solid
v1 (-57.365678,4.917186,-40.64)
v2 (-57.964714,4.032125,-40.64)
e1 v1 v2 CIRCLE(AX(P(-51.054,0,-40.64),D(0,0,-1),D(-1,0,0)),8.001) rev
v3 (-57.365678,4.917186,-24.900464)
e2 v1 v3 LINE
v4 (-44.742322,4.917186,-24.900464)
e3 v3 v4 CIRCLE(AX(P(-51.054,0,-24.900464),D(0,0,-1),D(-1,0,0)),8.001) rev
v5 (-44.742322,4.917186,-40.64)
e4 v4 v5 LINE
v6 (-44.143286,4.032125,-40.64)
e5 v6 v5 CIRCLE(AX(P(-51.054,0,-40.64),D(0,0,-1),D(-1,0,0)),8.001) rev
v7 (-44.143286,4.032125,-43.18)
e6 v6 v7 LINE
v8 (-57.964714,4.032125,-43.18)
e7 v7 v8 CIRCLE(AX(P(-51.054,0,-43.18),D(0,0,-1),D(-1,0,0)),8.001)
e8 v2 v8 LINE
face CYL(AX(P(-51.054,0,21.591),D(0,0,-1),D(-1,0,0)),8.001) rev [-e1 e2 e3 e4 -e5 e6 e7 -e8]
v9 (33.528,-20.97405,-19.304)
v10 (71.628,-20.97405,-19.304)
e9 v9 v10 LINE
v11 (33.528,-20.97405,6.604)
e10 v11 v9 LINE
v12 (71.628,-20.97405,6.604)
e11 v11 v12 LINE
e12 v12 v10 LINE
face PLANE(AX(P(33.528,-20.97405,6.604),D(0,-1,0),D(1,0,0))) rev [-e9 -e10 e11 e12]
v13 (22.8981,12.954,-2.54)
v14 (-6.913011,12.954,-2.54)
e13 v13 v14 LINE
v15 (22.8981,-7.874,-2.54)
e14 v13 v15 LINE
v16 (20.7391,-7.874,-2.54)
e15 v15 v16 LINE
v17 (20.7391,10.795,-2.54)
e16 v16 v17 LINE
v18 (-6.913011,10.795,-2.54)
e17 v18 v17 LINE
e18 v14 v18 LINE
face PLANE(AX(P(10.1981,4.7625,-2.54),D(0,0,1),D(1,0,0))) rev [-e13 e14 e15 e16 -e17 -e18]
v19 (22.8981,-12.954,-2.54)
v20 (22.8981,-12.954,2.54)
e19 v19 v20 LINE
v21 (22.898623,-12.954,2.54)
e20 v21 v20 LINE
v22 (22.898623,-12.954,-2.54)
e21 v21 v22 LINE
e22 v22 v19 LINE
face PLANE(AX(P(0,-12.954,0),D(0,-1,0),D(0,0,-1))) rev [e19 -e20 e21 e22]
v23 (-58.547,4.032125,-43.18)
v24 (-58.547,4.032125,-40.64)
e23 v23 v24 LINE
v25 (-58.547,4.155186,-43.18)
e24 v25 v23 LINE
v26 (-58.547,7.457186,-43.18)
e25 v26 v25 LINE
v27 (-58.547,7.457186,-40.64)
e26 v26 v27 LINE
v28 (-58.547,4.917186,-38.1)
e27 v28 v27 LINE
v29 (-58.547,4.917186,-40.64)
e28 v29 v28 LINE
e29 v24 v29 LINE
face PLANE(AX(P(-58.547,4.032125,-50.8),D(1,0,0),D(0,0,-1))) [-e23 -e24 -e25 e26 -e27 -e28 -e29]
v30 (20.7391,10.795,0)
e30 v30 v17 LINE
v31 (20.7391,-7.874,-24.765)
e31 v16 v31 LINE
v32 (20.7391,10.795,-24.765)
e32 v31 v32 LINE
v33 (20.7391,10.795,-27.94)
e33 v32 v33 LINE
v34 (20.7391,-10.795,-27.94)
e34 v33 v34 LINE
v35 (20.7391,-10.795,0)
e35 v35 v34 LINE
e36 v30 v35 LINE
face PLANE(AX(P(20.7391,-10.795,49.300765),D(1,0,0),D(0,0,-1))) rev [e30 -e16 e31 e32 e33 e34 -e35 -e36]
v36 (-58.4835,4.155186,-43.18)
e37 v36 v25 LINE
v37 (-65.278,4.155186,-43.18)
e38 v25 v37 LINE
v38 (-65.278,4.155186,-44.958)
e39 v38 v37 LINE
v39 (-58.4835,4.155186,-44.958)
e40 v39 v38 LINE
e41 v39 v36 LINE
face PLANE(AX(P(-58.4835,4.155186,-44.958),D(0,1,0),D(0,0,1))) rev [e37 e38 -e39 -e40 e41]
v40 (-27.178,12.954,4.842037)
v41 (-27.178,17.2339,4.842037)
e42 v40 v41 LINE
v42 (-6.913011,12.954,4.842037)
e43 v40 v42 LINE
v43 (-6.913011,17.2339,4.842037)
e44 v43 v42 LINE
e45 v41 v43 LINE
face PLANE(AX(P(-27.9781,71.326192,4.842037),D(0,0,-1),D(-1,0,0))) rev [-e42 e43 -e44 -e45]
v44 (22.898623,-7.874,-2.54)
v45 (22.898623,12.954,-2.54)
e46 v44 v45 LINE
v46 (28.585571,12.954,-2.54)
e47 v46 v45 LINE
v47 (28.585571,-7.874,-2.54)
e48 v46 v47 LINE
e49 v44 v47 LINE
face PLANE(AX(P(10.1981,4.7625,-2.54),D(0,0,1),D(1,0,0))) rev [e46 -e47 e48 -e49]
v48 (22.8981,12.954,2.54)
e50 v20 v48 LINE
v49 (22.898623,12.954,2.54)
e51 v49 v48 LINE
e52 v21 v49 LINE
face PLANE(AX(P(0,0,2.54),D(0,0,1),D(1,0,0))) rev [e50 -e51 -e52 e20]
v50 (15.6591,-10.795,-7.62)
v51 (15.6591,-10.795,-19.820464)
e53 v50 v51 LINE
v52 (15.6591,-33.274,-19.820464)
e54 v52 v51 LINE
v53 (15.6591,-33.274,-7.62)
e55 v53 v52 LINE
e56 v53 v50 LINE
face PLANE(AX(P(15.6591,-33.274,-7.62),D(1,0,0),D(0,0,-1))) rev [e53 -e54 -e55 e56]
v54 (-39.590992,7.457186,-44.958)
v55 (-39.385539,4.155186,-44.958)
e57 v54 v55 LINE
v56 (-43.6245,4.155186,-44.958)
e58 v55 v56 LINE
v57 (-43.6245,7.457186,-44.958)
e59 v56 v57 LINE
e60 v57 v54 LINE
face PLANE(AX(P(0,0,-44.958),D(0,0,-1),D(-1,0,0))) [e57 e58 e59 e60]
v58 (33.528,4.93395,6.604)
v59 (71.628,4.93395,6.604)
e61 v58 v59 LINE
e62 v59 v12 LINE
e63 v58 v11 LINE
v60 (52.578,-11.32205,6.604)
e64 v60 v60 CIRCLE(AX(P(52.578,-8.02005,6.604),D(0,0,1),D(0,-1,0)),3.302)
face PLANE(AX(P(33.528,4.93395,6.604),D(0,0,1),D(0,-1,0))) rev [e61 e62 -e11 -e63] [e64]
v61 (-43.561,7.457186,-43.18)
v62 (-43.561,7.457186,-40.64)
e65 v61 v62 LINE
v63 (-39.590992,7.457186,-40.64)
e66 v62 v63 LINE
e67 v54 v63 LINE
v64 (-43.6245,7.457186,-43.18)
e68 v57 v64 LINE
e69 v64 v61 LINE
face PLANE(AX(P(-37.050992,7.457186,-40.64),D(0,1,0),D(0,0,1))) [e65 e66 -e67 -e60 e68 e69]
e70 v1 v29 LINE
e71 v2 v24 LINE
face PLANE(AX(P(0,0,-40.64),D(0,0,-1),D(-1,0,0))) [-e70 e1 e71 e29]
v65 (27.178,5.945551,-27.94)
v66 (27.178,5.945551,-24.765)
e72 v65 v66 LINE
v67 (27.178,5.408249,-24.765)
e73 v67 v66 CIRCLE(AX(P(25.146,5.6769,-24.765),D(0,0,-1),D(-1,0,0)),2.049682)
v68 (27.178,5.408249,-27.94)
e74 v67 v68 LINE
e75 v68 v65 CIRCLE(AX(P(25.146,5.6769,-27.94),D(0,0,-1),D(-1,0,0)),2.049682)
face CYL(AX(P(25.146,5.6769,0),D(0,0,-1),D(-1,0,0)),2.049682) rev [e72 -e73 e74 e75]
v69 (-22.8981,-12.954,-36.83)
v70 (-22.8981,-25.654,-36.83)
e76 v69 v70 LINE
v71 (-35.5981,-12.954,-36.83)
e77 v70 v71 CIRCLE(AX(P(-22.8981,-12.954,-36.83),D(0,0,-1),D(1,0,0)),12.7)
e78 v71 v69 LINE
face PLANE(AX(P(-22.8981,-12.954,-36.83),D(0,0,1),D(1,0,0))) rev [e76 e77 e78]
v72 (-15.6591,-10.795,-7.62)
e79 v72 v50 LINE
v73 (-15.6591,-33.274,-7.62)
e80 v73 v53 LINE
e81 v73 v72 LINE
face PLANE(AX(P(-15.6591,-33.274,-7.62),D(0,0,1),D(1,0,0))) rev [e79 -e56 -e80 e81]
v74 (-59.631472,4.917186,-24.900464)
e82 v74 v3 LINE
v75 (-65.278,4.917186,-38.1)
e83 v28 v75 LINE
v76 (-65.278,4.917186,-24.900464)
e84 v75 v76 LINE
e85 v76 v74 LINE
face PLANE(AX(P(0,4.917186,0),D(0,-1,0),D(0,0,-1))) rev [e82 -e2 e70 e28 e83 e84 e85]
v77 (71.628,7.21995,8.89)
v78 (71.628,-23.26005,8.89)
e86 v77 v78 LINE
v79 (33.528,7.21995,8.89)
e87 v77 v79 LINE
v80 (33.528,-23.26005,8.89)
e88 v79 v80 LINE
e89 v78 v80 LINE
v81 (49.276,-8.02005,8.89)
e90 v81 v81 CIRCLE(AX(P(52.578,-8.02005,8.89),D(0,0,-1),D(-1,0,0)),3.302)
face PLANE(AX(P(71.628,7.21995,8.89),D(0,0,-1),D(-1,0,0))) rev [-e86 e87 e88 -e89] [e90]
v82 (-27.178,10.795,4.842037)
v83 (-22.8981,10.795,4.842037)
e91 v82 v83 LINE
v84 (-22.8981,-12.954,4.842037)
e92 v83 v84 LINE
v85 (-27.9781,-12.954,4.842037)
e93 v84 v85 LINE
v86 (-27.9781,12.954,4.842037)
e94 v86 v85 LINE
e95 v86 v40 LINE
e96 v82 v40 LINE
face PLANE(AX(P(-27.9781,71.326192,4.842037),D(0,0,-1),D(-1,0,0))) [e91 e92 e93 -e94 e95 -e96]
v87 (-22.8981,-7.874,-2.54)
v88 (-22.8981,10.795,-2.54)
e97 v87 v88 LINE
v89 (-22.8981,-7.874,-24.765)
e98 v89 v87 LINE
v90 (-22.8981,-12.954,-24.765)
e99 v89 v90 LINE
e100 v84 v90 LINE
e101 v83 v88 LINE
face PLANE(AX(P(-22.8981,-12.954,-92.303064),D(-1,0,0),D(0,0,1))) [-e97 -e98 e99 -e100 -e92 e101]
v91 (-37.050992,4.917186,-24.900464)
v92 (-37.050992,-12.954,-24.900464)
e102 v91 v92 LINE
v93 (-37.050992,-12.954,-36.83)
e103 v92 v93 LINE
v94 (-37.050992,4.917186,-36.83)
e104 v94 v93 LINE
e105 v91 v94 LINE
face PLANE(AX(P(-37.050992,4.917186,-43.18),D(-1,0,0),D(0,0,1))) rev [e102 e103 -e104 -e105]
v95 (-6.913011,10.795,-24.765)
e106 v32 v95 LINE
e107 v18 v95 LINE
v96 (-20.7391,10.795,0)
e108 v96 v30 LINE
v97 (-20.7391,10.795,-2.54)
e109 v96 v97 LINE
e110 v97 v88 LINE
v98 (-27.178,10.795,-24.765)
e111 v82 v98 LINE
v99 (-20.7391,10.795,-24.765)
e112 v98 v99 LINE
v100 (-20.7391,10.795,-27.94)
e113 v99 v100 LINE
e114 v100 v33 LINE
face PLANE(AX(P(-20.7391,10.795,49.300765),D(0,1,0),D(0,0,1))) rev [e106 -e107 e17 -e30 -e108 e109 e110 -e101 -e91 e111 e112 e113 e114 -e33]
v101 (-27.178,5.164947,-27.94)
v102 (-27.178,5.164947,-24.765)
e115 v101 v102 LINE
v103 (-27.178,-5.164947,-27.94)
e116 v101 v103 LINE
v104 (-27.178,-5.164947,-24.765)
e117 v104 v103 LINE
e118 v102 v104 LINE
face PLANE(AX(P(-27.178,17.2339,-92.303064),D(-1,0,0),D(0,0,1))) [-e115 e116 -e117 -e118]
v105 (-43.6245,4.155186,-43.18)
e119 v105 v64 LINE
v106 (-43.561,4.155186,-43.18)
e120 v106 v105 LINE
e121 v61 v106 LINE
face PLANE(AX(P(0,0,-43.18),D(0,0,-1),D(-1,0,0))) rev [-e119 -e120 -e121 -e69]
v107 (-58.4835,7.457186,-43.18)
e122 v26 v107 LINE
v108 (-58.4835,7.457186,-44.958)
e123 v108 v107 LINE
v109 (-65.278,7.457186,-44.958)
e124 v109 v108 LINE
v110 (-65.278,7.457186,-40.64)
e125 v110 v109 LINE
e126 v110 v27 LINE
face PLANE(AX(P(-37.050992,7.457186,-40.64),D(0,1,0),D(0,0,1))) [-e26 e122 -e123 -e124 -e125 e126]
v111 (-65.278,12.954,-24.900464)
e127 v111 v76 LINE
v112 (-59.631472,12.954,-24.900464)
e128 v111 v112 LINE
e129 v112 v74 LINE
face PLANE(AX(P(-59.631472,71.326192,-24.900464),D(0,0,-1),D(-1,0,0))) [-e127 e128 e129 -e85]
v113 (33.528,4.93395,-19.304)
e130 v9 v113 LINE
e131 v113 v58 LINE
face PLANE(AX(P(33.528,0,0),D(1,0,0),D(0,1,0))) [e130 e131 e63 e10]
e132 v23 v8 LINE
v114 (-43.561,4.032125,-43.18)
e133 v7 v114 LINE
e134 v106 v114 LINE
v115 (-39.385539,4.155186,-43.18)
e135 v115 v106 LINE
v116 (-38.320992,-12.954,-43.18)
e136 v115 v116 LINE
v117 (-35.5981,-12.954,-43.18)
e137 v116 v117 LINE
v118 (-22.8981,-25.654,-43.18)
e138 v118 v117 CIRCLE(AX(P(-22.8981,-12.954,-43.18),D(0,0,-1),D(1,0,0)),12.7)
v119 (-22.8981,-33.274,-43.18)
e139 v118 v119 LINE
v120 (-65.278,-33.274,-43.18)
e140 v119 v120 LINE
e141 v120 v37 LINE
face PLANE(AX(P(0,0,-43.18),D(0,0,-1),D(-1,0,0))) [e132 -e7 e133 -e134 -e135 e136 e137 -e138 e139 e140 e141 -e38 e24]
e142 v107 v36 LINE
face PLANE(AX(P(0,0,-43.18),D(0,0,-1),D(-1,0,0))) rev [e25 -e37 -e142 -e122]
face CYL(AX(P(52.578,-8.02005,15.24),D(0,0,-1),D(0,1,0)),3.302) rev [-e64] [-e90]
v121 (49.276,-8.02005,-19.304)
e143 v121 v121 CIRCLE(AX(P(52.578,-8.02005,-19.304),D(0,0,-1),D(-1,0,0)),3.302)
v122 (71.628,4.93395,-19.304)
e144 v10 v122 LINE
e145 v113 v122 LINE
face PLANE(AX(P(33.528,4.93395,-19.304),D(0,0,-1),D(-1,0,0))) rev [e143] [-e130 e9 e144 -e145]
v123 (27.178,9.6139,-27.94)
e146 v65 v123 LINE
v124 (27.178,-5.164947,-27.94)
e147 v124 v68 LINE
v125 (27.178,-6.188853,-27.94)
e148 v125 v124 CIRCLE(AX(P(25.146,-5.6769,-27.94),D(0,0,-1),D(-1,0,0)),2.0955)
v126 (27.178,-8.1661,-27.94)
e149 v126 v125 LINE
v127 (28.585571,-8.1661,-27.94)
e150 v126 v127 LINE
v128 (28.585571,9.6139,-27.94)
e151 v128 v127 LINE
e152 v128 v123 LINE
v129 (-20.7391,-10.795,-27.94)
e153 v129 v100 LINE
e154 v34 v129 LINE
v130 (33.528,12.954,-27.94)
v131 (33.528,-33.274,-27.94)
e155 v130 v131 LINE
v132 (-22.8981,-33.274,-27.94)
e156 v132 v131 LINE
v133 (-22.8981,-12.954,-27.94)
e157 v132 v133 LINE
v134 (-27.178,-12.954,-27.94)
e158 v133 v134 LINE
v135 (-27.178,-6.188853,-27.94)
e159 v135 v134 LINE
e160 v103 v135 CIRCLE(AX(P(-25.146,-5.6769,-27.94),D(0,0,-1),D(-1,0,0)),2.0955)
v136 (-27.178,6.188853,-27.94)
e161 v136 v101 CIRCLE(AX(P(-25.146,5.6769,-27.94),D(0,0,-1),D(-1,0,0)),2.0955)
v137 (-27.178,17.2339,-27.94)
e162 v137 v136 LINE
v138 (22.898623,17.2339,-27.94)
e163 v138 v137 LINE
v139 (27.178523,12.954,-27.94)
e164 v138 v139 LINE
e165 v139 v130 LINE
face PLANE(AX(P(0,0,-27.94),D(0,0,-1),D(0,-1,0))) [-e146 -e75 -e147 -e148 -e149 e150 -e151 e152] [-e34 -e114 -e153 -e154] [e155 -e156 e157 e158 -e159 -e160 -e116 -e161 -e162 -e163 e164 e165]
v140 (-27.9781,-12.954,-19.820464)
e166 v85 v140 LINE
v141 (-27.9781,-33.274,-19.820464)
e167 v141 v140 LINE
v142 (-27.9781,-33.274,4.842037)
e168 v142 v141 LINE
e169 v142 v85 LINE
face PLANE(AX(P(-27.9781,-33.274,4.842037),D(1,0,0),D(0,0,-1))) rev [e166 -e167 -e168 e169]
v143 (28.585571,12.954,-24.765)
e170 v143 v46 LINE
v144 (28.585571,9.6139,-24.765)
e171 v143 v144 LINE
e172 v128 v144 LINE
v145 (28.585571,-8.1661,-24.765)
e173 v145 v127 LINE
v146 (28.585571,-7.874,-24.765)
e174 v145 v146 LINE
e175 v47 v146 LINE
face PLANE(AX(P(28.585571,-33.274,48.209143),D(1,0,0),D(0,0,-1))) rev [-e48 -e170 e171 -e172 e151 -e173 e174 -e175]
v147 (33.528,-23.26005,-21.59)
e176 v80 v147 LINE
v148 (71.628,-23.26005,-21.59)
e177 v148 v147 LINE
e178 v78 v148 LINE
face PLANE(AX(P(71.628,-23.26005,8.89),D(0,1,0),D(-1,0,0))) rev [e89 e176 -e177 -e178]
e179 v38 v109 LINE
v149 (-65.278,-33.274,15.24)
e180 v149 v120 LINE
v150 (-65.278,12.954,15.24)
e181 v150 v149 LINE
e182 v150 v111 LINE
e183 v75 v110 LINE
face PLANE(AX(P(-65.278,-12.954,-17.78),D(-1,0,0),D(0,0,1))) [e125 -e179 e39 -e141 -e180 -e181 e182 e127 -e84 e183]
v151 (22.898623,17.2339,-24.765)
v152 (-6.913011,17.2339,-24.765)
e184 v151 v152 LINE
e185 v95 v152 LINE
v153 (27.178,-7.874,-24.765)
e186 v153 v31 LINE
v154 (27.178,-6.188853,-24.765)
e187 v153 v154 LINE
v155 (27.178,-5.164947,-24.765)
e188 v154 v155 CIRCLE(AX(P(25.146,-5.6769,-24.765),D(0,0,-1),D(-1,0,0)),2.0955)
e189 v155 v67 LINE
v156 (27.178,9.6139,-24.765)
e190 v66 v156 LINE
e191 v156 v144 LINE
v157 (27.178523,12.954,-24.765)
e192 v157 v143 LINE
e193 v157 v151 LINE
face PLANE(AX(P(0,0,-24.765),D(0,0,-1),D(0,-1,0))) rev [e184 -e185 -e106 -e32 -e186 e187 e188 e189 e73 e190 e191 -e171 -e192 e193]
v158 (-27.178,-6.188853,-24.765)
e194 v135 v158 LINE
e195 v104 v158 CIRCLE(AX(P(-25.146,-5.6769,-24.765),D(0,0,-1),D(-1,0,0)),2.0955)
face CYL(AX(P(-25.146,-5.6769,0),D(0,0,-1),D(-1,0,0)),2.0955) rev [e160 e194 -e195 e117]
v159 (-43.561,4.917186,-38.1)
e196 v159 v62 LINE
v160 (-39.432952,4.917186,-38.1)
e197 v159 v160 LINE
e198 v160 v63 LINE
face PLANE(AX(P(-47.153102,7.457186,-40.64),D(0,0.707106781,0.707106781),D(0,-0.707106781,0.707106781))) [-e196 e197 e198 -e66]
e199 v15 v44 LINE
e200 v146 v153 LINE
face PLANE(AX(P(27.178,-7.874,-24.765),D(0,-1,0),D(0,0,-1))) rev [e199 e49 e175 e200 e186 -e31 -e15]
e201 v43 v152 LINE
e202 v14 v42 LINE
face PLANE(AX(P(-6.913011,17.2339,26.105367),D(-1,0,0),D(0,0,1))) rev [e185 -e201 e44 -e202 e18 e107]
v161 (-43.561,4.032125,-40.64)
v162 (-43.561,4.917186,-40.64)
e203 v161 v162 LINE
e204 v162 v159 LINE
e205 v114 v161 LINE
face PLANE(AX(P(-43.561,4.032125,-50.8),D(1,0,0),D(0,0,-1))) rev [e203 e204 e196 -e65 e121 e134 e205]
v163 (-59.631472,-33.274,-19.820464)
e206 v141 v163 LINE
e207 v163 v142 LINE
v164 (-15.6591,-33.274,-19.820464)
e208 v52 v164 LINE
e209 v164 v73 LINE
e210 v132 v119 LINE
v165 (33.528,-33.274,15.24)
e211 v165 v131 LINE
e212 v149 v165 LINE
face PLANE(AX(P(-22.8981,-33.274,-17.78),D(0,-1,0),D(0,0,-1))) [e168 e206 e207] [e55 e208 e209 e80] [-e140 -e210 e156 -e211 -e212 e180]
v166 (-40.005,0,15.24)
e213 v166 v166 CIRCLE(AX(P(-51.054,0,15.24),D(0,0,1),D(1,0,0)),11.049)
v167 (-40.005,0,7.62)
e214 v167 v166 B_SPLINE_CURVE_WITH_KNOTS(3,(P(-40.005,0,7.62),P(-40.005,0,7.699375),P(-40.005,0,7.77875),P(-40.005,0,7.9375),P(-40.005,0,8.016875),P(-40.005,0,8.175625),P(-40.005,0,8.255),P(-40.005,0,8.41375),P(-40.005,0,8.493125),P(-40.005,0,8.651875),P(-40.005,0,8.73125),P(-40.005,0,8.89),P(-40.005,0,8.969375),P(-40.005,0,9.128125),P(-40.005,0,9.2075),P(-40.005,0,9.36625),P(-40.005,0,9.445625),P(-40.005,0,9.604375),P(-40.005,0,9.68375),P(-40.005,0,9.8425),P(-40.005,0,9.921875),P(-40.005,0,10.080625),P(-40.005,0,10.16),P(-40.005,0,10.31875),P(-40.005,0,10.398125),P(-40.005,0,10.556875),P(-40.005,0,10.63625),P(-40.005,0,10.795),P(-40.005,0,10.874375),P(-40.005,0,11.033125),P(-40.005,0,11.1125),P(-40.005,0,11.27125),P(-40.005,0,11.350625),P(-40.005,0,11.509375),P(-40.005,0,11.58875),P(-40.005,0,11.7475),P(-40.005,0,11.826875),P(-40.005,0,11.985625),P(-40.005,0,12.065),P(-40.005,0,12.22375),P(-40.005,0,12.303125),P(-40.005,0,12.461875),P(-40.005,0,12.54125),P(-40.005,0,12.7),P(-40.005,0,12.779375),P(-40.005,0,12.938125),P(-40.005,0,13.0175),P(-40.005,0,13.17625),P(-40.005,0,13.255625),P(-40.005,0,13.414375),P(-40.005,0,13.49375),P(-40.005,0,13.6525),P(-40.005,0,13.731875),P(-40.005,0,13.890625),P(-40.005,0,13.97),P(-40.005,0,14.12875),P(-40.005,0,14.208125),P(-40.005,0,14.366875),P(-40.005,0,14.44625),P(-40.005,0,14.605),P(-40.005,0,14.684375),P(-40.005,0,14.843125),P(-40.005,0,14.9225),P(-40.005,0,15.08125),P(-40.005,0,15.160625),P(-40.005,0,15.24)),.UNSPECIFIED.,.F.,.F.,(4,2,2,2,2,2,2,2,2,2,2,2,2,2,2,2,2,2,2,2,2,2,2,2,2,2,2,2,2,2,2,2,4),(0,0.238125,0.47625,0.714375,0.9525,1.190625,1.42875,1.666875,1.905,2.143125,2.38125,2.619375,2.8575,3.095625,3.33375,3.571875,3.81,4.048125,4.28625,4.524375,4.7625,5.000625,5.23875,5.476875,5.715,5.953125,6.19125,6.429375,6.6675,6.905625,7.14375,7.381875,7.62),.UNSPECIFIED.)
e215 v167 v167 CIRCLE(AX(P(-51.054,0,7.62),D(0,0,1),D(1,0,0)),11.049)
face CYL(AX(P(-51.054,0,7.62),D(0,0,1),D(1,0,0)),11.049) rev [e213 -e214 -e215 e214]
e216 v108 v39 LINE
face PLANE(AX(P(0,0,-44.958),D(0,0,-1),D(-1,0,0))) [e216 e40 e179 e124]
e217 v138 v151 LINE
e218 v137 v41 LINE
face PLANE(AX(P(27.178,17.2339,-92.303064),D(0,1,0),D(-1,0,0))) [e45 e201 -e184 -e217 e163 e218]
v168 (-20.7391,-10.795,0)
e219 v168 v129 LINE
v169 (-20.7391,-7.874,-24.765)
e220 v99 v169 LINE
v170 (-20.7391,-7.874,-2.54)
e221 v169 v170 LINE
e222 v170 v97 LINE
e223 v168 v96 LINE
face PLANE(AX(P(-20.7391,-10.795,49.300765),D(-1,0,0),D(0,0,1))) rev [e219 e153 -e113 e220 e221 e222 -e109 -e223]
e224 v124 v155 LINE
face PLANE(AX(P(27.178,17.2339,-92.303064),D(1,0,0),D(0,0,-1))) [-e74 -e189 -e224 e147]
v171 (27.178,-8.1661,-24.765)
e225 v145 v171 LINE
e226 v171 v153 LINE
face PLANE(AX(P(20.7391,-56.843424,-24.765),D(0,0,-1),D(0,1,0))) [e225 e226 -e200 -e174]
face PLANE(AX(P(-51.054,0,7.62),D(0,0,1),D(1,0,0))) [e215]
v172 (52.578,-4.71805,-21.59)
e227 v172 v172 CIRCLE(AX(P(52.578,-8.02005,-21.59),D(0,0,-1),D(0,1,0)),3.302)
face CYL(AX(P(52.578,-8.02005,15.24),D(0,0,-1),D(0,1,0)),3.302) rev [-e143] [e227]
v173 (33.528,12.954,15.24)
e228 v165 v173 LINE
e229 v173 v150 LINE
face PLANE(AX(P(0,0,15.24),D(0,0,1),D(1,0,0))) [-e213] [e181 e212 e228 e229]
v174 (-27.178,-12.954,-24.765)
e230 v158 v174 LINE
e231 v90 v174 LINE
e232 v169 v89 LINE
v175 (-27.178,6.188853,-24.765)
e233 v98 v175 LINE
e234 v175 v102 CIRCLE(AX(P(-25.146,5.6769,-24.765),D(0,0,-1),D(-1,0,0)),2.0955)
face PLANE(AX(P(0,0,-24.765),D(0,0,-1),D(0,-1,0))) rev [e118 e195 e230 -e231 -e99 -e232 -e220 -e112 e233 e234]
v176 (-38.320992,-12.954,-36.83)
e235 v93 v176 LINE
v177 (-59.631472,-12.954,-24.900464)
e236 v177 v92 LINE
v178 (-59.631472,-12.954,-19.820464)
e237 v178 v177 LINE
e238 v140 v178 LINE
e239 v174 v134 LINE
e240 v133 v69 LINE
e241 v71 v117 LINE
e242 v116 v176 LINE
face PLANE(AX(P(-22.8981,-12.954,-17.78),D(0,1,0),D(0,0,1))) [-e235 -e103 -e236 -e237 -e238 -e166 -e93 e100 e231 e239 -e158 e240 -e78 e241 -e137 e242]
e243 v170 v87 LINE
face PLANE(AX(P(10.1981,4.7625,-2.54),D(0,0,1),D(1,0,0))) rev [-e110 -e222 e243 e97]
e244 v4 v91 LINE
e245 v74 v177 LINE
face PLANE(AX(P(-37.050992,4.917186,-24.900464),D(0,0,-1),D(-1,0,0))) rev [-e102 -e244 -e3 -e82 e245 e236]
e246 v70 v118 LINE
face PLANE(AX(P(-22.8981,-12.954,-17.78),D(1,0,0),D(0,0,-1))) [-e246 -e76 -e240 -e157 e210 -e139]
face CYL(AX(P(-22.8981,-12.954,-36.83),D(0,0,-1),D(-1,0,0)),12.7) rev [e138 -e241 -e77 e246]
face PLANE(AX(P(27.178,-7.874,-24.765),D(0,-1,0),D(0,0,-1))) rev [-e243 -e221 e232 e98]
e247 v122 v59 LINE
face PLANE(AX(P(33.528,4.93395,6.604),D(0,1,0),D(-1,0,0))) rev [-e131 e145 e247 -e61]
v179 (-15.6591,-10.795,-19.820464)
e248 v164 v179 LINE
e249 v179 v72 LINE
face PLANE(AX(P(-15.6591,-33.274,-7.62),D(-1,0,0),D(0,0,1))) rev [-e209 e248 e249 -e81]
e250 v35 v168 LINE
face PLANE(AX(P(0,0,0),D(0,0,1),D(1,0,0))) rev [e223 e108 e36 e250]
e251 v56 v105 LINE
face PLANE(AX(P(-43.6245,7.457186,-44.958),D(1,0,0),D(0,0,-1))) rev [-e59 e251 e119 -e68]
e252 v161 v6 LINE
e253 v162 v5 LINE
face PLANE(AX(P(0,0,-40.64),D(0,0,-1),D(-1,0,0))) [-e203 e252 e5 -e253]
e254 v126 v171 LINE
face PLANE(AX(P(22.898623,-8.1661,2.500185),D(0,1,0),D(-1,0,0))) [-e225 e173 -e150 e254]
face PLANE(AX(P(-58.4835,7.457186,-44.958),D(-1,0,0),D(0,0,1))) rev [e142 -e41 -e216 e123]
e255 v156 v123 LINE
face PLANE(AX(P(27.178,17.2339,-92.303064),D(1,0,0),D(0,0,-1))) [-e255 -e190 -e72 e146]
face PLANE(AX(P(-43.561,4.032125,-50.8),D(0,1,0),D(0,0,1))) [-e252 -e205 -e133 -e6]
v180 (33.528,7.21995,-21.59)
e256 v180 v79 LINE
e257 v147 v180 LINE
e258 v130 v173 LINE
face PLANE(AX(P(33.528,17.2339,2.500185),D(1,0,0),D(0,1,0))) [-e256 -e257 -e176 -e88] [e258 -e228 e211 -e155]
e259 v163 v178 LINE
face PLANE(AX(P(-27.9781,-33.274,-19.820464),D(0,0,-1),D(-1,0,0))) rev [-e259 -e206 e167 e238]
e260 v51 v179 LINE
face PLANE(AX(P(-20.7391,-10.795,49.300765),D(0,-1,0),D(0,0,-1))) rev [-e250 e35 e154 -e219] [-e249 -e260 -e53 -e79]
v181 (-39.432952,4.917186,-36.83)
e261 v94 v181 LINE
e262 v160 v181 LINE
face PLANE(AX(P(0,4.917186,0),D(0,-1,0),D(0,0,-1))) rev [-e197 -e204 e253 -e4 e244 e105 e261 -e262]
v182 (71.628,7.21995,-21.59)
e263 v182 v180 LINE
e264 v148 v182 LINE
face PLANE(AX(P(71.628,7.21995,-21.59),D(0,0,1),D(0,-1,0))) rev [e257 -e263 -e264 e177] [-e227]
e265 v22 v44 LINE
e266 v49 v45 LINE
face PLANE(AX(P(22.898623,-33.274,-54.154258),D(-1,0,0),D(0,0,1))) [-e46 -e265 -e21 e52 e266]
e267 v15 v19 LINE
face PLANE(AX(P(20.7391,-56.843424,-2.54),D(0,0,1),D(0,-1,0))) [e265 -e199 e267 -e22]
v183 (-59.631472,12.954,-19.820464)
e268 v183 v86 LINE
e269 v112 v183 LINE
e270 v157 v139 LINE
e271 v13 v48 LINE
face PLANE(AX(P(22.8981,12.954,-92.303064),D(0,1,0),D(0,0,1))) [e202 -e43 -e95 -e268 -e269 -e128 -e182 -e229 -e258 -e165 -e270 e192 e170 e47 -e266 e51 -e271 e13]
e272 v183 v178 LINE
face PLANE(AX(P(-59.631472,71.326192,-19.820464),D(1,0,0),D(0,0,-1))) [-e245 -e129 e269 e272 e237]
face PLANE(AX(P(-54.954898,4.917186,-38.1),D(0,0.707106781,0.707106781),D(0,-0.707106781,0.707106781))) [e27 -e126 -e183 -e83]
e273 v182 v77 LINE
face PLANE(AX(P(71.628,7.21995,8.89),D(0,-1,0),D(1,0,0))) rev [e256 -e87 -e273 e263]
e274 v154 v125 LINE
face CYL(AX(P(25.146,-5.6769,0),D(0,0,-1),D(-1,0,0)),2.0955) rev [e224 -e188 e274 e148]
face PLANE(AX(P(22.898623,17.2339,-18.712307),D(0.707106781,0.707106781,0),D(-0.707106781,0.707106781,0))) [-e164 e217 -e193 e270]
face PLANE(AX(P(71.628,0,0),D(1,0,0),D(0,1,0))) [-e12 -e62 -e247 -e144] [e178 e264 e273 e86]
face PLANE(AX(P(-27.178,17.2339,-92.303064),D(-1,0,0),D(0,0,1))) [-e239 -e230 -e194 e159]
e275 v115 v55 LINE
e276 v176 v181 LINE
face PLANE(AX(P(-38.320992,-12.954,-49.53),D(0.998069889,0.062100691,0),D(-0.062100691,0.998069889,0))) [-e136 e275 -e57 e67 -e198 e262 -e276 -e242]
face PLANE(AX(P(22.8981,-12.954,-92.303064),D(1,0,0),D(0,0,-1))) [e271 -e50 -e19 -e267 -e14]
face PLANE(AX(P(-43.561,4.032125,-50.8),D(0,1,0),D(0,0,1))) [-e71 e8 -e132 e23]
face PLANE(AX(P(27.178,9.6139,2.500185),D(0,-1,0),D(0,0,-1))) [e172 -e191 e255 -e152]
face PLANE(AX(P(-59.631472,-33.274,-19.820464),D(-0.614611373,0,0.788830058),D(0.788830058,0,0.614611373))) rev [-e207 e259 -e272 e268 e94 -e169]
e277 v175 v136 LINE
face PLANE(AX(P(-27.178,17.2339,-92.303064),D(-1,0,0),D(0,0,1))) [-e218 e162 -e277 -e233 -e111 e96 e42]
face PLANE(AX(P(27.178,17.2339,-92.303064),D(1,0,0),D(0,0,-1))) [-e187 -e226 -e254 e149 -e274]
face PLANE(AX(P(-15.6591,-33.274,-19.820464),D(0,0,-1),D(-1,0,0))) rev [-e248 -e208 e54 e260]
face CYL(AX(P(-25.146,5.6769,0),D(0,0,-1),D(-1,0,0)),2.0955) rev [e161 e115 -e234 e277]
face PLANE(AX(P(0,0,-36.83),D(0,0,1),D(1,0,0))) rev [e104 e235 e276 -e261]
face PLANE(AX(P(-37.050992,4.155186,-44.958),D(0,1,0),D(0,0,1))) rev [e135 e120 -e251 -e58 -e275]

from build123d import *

# Parameters (mm, degrees)
SKETCH1_W                = 54.356
SKETCH1_H                = 34.4678
SKETCH1_W_2              = 40.2082
SKETCH1_H_2              = 20.32
BOSS_EXTRUDE1_DEPTH      = 27.94
SKETCH2_W                = 54.356
SKETCH2_H                = 34.4678
SKETCH2_W_2              = 45.7962
SKETCH2_H_2              = 25.908
CUT_EXTRUDE1_DEPTH       = 24.765
SKETCH3_R                = 2.04968225
SKETCH3_R_2              = 2.0955
CUT_EXTRUDE2_DEPTH       = 43.618007851
SKETCH4_W                = 19.05
SKETCH4_H                = 9.525
CUT_EXTRUDE3_DEPTH       = 12.7
SKETCH5_W                = 45.7962
SKETCH5_H                = 25.908
BOSS_EXTRUDE2_DEPTH      = 2.54
SKETCH6_W                = 25.4
SKETCH6_H                = 4.2799
BOSS_EXTRUDE3_DEPTH      = 27.305
SKETCH7_W                = 25.4
SKETCH7_H                = 6.35
BOSS_EXTRUDE4_DEPTH      = 19.05
SKETCH10_W               = 3.175
SKETCH10_H               = 19.05
BOSS_EXTRUDE5_DEPTH      = 19.05
CHAMFER1_SIZE            = 19.05
SKETCH12_W               = 7.62
SKETCH12_H               = 31.75
BOSS_EXTRUDE6_DEPTH      = 3.175
SKETCH13_W               = 41.4782
SKETCH13_H               = 21.59
CUT_EXTRUDE7_DEPTH       = 27.94
SKETCH14_W               = 22.225
SKETCH14_H               = 20.828
SKETCH14_W_2             = 49.53
SKETCH14_H_2             = 7.4549
CUT_EXTRUDE8_DEPTH       = 61.866925258
SKETCH15_W               = 3.175
SKETCH15_H               = 4.2799
CUT_EXTRUDE9_DEPTH       = 64.49980823
SKETCH16_W               = 45.796723327
SKETCH16_H               = 30.48
BOSS_EXTRUDE7_DEPTH      = 20.32
BOSS_EXTRUDE8_DEPTH      = 15.24
BOSS_EXTRUDE8_DEPTH_BACK = 10.16
SKETCH17_W               = 42.3799
SKETCH17_H               = 20.32
SKETCH18_W               = 28.227007584
SKETCH18_H               = 18.279535796
BOSS_EXTRUDE9_DEPTH      = 17.871186
SKETCH19_R               = 8.001
CUT_EXTRUDE10_DEPTH      = 18.279536
SKETCH20_W               = 19.05
SKETCH20_H               = 21.1201
CUT_EXTRUDE11_DEPTH      = 75.022207933
SKETCH21_W               = 45.796723327
SKETCH21_H               = 46.228
BOSS_EXTRUDE10_DEPTH     = 12.7
SKETCH25_W               = 6.35
SKETCH25_H               = 7.62
SKETCH25_W_2             = 10.629376673
SKETCH25_H_2             = 25.1079
BOSS_EXTRUDE12_DEPTH     = 3.175
SKETCH26_W               = 10.629376673
SKETCH26_H               = 50.5079
BOSS_EXTRUDE14_DEPTH     = 17.78
BOSS_EXTRUDE15_START     = -3.175
SKETCH27_W               = 4.942428742
SKETCH27_H               = 50.5079
BOSS_EXTRUDE15_DEPTH     = 25.4
SKETCH28_W               = 7.846471258
SKETCH28_H               = 22.225
BOSS_EXTRUDE16_DEPTH     = 25.4
SKETCH29_W               = 30.48
SKETCH29_H               = 30.48
BOSS_EXTRUDE17_DEPTH     = 38.1
SKETCH30_W               = 25.908
SKETCH30_H               = 25.908
CUT_EXTRUDE13_DEPTH      = 38.1
SKETCH31_R               = 3.302
CUT_EXTRUDE14_DEPTH      = 88.144583079
BOSS_EXTRUDE18_DEPTH     = 20.32
SKETCH34_W               = 31.3182
SKETCH34_H               = 12.200464204
CUT_EXTRUDE15_DEPTH      = 89.208287701
BOSS_EXTRUDE22_REACH     = 99.704
SKETCH37_R               = 11.049
CUT_EXTRUDE16_DEPTH      = 7.62
BOSS_EXTRUDE25_REACH     = 90.533
SKETCH38_W               = 20.264989175
SKETCH38_H               = 6.4389
SKETCH39_W               = 10.629376673
SKETCH39_H               = 43.18
CUT_EXTRUDE17_DEPTH      = 4.2799
BOSS_EXTRUDE26_DEPTH     = 3.175
SKETCH42_W               = 28.227007584
SKETCH42_H               = 2.54
BOSS_EXTRUDE27_DEPTH     = 2.54
CUT_EXTRUDE18_DEPTH      = 7.62
CUT_EXTRUDE18_DEPTH_BACK = 2.54
SKETCH41_W               = 14.986
SKETCH41_H               = 7.62
SKETCH43_W               = 6.573507584
SKETCH43_H               = 3.302
SKETCH43_W_2             = 6.7945
BOSS_EXTRUDE28_DEPTH     = 1.778
BOSS_EXTRUDE29_DEPTH     = 6.731
BOSS_EXTRUDE30_DEPTH     = 6.510007584
CUT_EXTRUDE19_DEPTH      = 6.35
CUT_EXTRUDE20_DEPTH      = 6.35
CUT_EXTRUDE20_DEPTH_BACK = 6.35


with BuildPart() as part:
    # Sketch1 → Boss-Extrude1 (new body)
    with BuildSketch(Plane.XY):
        Rectangle(SKETCH1_W, SKETCH1_H)
        Rectangle(SKETCH1_W_2, SKETCH1_H_2, mode=Mode.SUBTRACT)
    extrude(amount=-BOSS_EXTRUDE1_DEPTH)

    # Sketch2 → Cut-Extrude1 (cut)
    with BuildSketch(Plane.XY):
        Rectangle(SKETCH2_W, SKETCH2_H)
        Rectangle(SKETCH2_W_2, SKETCH2_H_2, mode=Mode.SUBTRACT)
    extrude(amount=-CUT_EXTRUDE1_DEPTH, mode=Mode.SUBTRACT)

    # Sketch3 → Cut-Extrude2 (cut, through all)
    with BuildSketch(Plane(origin=(0, 0, -27.94), x_dir=(-1, 0, 0), z_dir=(0, 0, -1))):
        with Locations((-25.146, 5.6769)):
            Circle(SKETCH3_R)
        with Locations((-25.146, -5.6769)):
            Circle(SKETCH3_R_2)
        with Locations((25.146, -5.6769)):
            Circle(SKETCH3_R_2)
        with Locations((25.146, 5.6769)):
            Circle(SKETCH3_R_2)
    extrude(amount=-CUT_EXTRUDE2_DEPTH, mode=Mode.SUBTRACT)

    # Sketch4 → Cut-Extrude3 (cut)
    with BuildSketch(Plane(origin=(22.8981, 0, 0), x_dir=(0, 0, -1), z_dir=(1, 0, 0))):
        with Locations((12.065, 0)):
            Rectangle(SKETCH4_W, SKETCH4_H)
    extrude(amount=-CUT_EXTRUDE3_DEPTH, mode=Mode.SUBTRACT)

    # Sketch5 → Boss-Extrude2 (add)
    with BuildSketch(Plane.XY):
        Rectangle(SKETCH5_W, SKETCH5_H)
    extrude(amount=BOSS_EXTRUDE2_DEPTH)

    # Sketch6 → Boss-Extrude3 (add)
    with BuildSketch(Plane.XY.offset(2.54)):
        with Locations((0, -15.09395)):
            Rectangle(SKETCH6_W, SKETCH6_H)
    extrude(amount=-BOSS_EXTRUDE3_DEPTH)

    # Sketch7 → Boss-Extrude4 (add)
    with BuildSketch(Plane.XY.offset(2.54)):
        with Locations((0, -14.0589)):
            Rectangle(SKETCH7_W, SKETCH7_H)
    extrude(amount=BOSS_EXTRUDE4_DEPTH)

    # Sketch10 → Boss-Extrude5 (add)
    with BuildSketch(Plane(origin=(0, -10.8839, 0), x_dir=(1, 0, 0), z_dir=(0, 1, 0))):
        with Locations((11.1125, -12.065)):
            Rectangle(SKETCH10_W, SKETCH10_H)
        with Locations((-11.1125, -12.065)):
            Rectangle(SKETCH10_W, SKETCH10_H)
    extrude(amount=BOSS_EXTRUDE5_DEPTH)

    # Chamfer1
    chamfer1_edges = [part.edges().sort_by_distance(p)[0] for p in [
        (-11.1125, 8.1661, 21.59),
        (11.1125, 8.1661, 21.59),
    ]]
    chamfer(chamfer1_edges, length=CHAMFER1_SIZE - 0.0001)  # a hair under: the kernel refuses the full size

    # Sketch12 → Boss-Extrude6 (add)
    with BuildSketch(Plane.XZ.offset(17.2339)):
        with Locations((0, -12.065)):
            Rectangle(SKETCH12_W, SKETCH12_H)
    extrude(amount=BOSS_EXTRUDE6_DEPTH)

    # Sketch13 → Cut-Extrude7 (cut)
    with BuildSketch(Plane(origin=(0, 0, -27.94), x_dir=(-1, 0, 0), z_dir=(0, 0, -1))):
        Rectangle(SKETCH13_W, SKETCH13_H)
    extrude(amount=-CUT_EXTRUDE7_DEPTH, mode=Mode.SUBTRACT)

    # Sketch14 → Cut-Extrude8 (cut, through all)
    with BuildSketch(Plane.ZY.offset(22.8981)):
        with Locations((-13.6525, 2.54)):
            Rectangle(SKETCH14_W, SKETCH14_H)
        with Locations((-3.175, -16.68145)):
            Rectangle(SKETCH14_W_2, SKETCH14_H_2)
    extrude(amount=-CUT_EXTRUDE8_DEPTH, mode=Mode.SUBTRACT)

    # Sketch15 → Cut-Extrude9 (cut, through all)
    with BuildSketch(Plane.ZY.offset(27.178)):
        with Locations((-26.3525, -15.09395)):
            Rectangle(SKETCH15_W, SKETCH15_H)
    extrude(amount=-CUT_EXTRUDE9_DEPTH, mode=Mode.SUBTRACT)

    # Sketch16 → Boss-Extrude7 (add)
    with BuildSketch(Plane.XZ.offset(12.954)):
        with Locations((0.000261663, -12.7)):
            Rectangle(SKETCH16_W, SKETCH16_H)
    extrude(amount=BOSS_EXTRUDE7_DEPTH)

    # Sketch20 → Cut-Extrude11 (cut, through all)
    with BuildSketch(Plane.ZY.offset(22.8981)):
        with Locations((12.065, -2.39395)):
            Rectangle(SKETCH20_W, SKETCH20_H)
    extrude(amount=-CUT_EXTRUDE11_DEPTH, mode=Mode.SUBTRACT)

    # Sketch21 → Boss-Extrude10 (add)
    with BuildSketch(Plane.XY.offset(2.54)):
        with Locations((0.000261663, -10.16)):
            Rectangle(SKETCH21_W, SKETCH21_H)
    extrude(amount=BOSS_EXTRUDE10_DEPTH)

    # Sketch25 → Boss-Extrude12 (add)
    with BuildSketch(Plane(origin=(0, 0, -27.94), x_dir=(-1, 0, 0), z_dir=(0, 0, -1))):
        with Locations((-30.353, 13.4239)):
            Rectangle(SKETCH25_W, SKETCH25_H)
        with Locations((-28.213311664, -20.72005)):
            Rectangle(SKETCH25_W_2, SKETCH25_H_2)
    extrude(amount=-BOSS_EXTRUDE12_DEPTH)

    # Sketch26 → Boss-Extrude14 (add)
    with BuildSketch(Plane.XY.offset(15.24)):
        with Locations((28.213311664, -8.02005)):
            Rectangle(SKETCH26_W, SKETCH26_H)
    extrude(amount=-BOSS_EXTRUDE14_DEPTH)

    # Sketch27 → Boss-Extrude15 (add)
    with BuildSketch(Plane.XY.offset(-24.765).offset(BOSS_EXTRUDE15_START)):
        with Locations((31.056785629, -8.02005)):
            Rectangle(SKETCH27_W, SKETCH27_H)
    extrude(amount=BOSS_EXTRUDE15_DEPTH)

    # Sketch28 → Boss-Extrude16 (add)
    with BuildSketch(Plane(origin=(0, -7.874, 0), x_dir=(1, 0, 0), z_dir=(0, 1, 0))):
        with Locations((24.662335629, 13.6525)):
            Rectangle(SKETCH28_W, SKETCH28_H)
    extrude(amount=-BOSS_EXTRUDE16_DEPTH)

    # Sketch29 → Boss-Extrude17 (add)
    with BuildSketch(Plane(origin=(33.528, 0, 0), x_dir=(0, 0, -1), z_dir=(1, 0, 0))):
        with Locations((6.35, -8.02005)):
            Rectangle(SKETCH29_W, SKETCH29_H)
    extrude(amount=BOSS_EXTRUDE17_DEPTH)

    # Sketch30 → Cut-Extrude13 (cut)
    with BuildSketch(Plane(origin=(71.628, 0, 0), x_dir=(0, 0, -1), z_dir=(1, 0, 0))):
        with Locations((6.35, -8.02005)):
            Rectangle(SKETCH30_W, SKETCH30_H)
    extrude(amount=-CUT_EXTRUDE13_DEPTH, mode=Mode.SUBTRACT)

    # Sketch31 → Cut-Extrude14 (cut, through all)
    with BuildSketch(Plane(origin=(0, 0, -21.59), x_dir=(-1, 0, 0), z_dir=(0, 0, -1))):
        with Locations(Location((-52.578, -8.02005, 0), (0, 0, 90))):
            Circle(SKETCH31_R)
    extrude(amount=-CUT_EXTRUDE14_DEPTH, mode=Mode.SUBTRACT)



with BuildPart() as body_2:
    # Sketch17 → Boss-Extrude8 (new, two sides: drawn at the far end of the back side and taken through both)
    with BuildSketch(Plane(origin=(0, 0, -27.94), x_dir=(-1, 0, 0), z_dir=(0, 0, -1)).offset(-BOSS_EXTRUDE8_DEPTH_BACK)):
        with Locations((44.08805, -23.114)):
            Rectangle(SKETCH17_W, SKETCH17_H)
    extrude(amount=BOSS_EXTRUDE8_DEPTH + BOSS_EXTRUDE8_DEPTH_BACK)

    # Sketch18 → Boss-Extrude9 (add)
    with BuildSketch(Plane(origin=(0, -12.954, 0), x_dir=(1, 0, 0), z_dir=(0, 1, 0))):
        with Locations((-51.164496208, 34.040232102)):
            Rectangle(SKETCH18_W, SKETCH18_H)
    extrude(amount=BOSS_EXTRUDE9_DEPTH)

    # Sketch19 → Cut-Extrude10 (cut)
    with BuildSketch(Plane(origin=(0, 0, -43.18), x_dir=(-1, 0, 0), z_dir=(0, 0, -1))):
        with Locations((51.054, 0)):
            Circle(SKETCH19_R)
    extrude(amount=-CUT_EXTRUDE10_DEPTH, mode=Mode.SUBTRACT)


with BuildPart() as part_1:
    add(part.part)

    add(body_2.part)  # Boss-Extrude18 merges body 2
    # Sketch33 → Boss-Extrude18 (add)
    with BuildSketch(Plane.XZ.offset(33.274)):
        Polygon((-65.278, -17.78), (-22.8981, 15.24), (-22.8981, -17.78), align=None)
    extrude(amount=-BOSS_EXTRUDE18_DEPTH)

    # Sketch34 → Cut-Extrude15 (cut, through all)
    with BuildSketch(Plane(origin=(0, -10.795, 0), x_dir=(1, 0, 0), z_dir=(0, 1, 0))):
        Polygon((-27.9781, 19.820464204), (-59.63147171, 19.820464204), (-27.9781, -4.842036979), align=None)
        with Locations((0, 13.720232102)):
            Rectangle(SKETCH34_W, SKETCH34_H)
    extrude(amount=-CUT_EXTRUDE15_DEPTH, mode=Mode.SUBTRACT)

    # Boss-Extrude22: up to this face of the body (flat: up to its plane)
    boss_extrude22_end = Plane(part_1.part.faces().sort_by_distance((0.000186903, 12.954, 6.350020732))[0])
    # Sketch36 → Boss-Extrude22 (add, up to the picked face)
    with BuildSketch(Plane.XZ.offset(33.274), mode=Mode.PRIVATE) as boss_extrude22_sk1:
        Polygon((-65.278, -17.78), (-65.278, 15.24), (-22.8981, 15.24), (-22.8981, 8.800083128), (-22.8981, 4.842036979), (-27.9781, 4.842036979), (-59.63147171, -19.820464204), (-59.63147171, -24.900464204), (-65.278, -24.900464204), (-65.278, -19.820464204), align=None)
    boss_extrude22_tool1 = split(extrude(boss_extrude22_sk1.sketch, amount=-BOSS_EXTRUDE22_REACH, mode=Mode.PRIVATE), bisect_by=boss_extrude22_end, keep=Keep.BOTH, mode=Mode.PRIVATE)
    add(boss_extrude22_tool1.solids().sort_by(Axis((-49.126588, -33.274, 1.423085), (0, 1, 0)))[0])

    # Sketch37 → Cut-Extrude16 (cut)
    with BuildSketch(Plane.XY.offset(15.24)):
        with Locations((-51.054, 0)):
            Circle(SKETCH37_R)
    extrude(amount=-CUT_EXTRUDE16_DEPTH, mode=Mode.SUBTRACT)

    # Boss-Extrude25: up to this face of the body (flat: up to its plane)
    boss_extrude25_end = Plane(part_1.part.faces().sort_by_distance((-25.4381, 0, 4.842036979))[0])
    # Sketch38 → Boss-Extrude25 (add, up to the picked face)
    with BuildSketch(Plane.XY.offset(-24.765), mode=Mode.PRIVATE) as boss_extrude25_sk1:
        with Locations((-17.045505412, 14.01445)):
            Rectangle(SKETCH38_W, SKETCH38_H)
    boss_extrude25_tool1 = split(extrude(boss_extrude25_sk1.sketch, amount=BOSS_EXTRUDE25_REACH, mode=Mode.PRIVATE), bisect_by=boss_extrude25_end, keep=Keep.BOTH, mode=Mode.PRIVATE)
    add(boss_extrude25_tool1.solids().sort_by(Axis((-17.045505, 14.01445, -24.765), (0, 0, 1)))[0])

    # Sketch39 → Cut-Extrude17 (cut)
    with BuildSketch(Plane(origin=(0, 17.2339, 0), x_dir=(1, 0, 0), z_dir=(0, 1, 0))):
        with Locations((28.213311664, 6.35)):
            Rectangle(SKETCH39_W, SKETCH39_H)
    extrude(amount=-CUT_EXTRUDE17_DEPTH, mode=Mode.SUBTRACT)

    # Sketch40 → Boss-Extrude26 (add)
    with BuildSketch(Plane(origin=(0, 0, -27.94), x_dir=(-1, 0, 0), z_dir=(0, 0, -1))):
        Polygon((-22.898623327, 12.954), (-22.898623327, 17.2339), (-27.178523327, 12.954), align=None)
    extrude(amount=-BOSS_EXTRUDE26_DEPTH)

    # Sketch42 → Boss-Extrude27 (add)
    with BuildSketch(Plane(origin=(0, 0, -43.18), x_dir=(-1, 0, 0), z_dir=(0, 0, -1))):
        with Locations((51.164496208, 6.187186)):
            Rectangle(SKETCH42_W, SKETCH42_H)
    extrude(amount=-BOSS_EXTRUDE27_DEPTH)

    # Sketch41 → Cut-Extrude18 (cut, two sides: drawn at the far end of the back side and taken through both)
    with BuildSketch(Plane(origin=(0, 0, -43.18), x_dir=(-1, 0, 0), z_dir=(0, 0, -1)).offset(-CUT_EXTRUDE18_DEPTH_BACK)):
        with Locations((51.054, 7.842124998)):
            Rectangle(SKETCH41_W, SKETCH41_H)
    extrude(amount=CUT_EXTRUDE18_DEPTH + CUT_EXTRUDE18_DEPTH_BACK, mode=Mode.SUBTRACT)

    # Sketch43 → Boss-Extrude28 (add)
    with BuildSketch(Plane(origin=(0, 0, -43.18), x_dir=(-1, 0, 0), z_dir=(0, 0, -1))):
        with Locations((40.337746208, 5.806186)):
            Rectangle(SKETCH43_W, SKETCH43_H)
        with Locations((61.88075, 5.806186)):
            Rectangle(SKETCH43_W_2, SKETCH43_H)
    extrude(amount=BOSS_EXTRUDE28_DEPTH)

    # Sketch44 → Boss-Extrude29 (add)
    with BuildSketch(Plane.ZY.offset(65.278)):
        Polygon((-40.64, 7.457186), (-40.64, 4.917186), (-38.1, 4.917186), align=None)
    extrude(amount=-BOSS_EXTRUDE29_DEPTH)

    # Sketch45 → Boss-Extrude30 (add)
    with BuildSketch(Plane(origin=(-37.050992416, 0, 0), x_dir=(0, 0, -1), z_dir=(1, 0, 0))):
        Polygon((40.64, 4.917186), (40.64, 7.457186), (38.1, 4.917186), align=None)
    extrude(amount=-BOSS_EXTRUDE30_DEPTH)

    # Sketch46 → Cut-Extrude19 (cut)
    with BuildSketch(Plane(origin=(0, 0, -43.18), x_dir=(-1, 0, 0), z_dir=(0, 0, -1))):
        with BuildLine():
            Line((22.8981, -12.954), (35.5981, -12.954))
            ThreePointArc((35.5981, -12.954), (31.878356121, -21.934256121), (22.8981, -25.654))
            Line((22.8981, -25.654), (22.8981, -12.954))
        make_face()
    extrude(amount=-CUT_EXTRUDE19_DEPTH, mode=Mode.SUBTRACT)

    # Sketch47 → Cut-Extrude20 (cut, two sides: drawn at the far end of the back side and taken through both)
    with BuildSketch(Plane(origin=(0, 0, -43.18), x_dir=(-1, 0, 0), z_dir=(0, 0, -1)).offset(-CUT_EXTRUDE20_DEPTH_BACK)):
        Polygon((37.050992416, 7.457186), (39.590992416, 7.457186), (38.320992416, -12.954), (37.050992416, -12.954), align=None)
    extrude(amount=CUT_EXTRUDE20_DEPTH + CUT_EXTRUDE20_DEPTH_BACK, mode=Mode.SUBTRACT)


solid = part_1.part
